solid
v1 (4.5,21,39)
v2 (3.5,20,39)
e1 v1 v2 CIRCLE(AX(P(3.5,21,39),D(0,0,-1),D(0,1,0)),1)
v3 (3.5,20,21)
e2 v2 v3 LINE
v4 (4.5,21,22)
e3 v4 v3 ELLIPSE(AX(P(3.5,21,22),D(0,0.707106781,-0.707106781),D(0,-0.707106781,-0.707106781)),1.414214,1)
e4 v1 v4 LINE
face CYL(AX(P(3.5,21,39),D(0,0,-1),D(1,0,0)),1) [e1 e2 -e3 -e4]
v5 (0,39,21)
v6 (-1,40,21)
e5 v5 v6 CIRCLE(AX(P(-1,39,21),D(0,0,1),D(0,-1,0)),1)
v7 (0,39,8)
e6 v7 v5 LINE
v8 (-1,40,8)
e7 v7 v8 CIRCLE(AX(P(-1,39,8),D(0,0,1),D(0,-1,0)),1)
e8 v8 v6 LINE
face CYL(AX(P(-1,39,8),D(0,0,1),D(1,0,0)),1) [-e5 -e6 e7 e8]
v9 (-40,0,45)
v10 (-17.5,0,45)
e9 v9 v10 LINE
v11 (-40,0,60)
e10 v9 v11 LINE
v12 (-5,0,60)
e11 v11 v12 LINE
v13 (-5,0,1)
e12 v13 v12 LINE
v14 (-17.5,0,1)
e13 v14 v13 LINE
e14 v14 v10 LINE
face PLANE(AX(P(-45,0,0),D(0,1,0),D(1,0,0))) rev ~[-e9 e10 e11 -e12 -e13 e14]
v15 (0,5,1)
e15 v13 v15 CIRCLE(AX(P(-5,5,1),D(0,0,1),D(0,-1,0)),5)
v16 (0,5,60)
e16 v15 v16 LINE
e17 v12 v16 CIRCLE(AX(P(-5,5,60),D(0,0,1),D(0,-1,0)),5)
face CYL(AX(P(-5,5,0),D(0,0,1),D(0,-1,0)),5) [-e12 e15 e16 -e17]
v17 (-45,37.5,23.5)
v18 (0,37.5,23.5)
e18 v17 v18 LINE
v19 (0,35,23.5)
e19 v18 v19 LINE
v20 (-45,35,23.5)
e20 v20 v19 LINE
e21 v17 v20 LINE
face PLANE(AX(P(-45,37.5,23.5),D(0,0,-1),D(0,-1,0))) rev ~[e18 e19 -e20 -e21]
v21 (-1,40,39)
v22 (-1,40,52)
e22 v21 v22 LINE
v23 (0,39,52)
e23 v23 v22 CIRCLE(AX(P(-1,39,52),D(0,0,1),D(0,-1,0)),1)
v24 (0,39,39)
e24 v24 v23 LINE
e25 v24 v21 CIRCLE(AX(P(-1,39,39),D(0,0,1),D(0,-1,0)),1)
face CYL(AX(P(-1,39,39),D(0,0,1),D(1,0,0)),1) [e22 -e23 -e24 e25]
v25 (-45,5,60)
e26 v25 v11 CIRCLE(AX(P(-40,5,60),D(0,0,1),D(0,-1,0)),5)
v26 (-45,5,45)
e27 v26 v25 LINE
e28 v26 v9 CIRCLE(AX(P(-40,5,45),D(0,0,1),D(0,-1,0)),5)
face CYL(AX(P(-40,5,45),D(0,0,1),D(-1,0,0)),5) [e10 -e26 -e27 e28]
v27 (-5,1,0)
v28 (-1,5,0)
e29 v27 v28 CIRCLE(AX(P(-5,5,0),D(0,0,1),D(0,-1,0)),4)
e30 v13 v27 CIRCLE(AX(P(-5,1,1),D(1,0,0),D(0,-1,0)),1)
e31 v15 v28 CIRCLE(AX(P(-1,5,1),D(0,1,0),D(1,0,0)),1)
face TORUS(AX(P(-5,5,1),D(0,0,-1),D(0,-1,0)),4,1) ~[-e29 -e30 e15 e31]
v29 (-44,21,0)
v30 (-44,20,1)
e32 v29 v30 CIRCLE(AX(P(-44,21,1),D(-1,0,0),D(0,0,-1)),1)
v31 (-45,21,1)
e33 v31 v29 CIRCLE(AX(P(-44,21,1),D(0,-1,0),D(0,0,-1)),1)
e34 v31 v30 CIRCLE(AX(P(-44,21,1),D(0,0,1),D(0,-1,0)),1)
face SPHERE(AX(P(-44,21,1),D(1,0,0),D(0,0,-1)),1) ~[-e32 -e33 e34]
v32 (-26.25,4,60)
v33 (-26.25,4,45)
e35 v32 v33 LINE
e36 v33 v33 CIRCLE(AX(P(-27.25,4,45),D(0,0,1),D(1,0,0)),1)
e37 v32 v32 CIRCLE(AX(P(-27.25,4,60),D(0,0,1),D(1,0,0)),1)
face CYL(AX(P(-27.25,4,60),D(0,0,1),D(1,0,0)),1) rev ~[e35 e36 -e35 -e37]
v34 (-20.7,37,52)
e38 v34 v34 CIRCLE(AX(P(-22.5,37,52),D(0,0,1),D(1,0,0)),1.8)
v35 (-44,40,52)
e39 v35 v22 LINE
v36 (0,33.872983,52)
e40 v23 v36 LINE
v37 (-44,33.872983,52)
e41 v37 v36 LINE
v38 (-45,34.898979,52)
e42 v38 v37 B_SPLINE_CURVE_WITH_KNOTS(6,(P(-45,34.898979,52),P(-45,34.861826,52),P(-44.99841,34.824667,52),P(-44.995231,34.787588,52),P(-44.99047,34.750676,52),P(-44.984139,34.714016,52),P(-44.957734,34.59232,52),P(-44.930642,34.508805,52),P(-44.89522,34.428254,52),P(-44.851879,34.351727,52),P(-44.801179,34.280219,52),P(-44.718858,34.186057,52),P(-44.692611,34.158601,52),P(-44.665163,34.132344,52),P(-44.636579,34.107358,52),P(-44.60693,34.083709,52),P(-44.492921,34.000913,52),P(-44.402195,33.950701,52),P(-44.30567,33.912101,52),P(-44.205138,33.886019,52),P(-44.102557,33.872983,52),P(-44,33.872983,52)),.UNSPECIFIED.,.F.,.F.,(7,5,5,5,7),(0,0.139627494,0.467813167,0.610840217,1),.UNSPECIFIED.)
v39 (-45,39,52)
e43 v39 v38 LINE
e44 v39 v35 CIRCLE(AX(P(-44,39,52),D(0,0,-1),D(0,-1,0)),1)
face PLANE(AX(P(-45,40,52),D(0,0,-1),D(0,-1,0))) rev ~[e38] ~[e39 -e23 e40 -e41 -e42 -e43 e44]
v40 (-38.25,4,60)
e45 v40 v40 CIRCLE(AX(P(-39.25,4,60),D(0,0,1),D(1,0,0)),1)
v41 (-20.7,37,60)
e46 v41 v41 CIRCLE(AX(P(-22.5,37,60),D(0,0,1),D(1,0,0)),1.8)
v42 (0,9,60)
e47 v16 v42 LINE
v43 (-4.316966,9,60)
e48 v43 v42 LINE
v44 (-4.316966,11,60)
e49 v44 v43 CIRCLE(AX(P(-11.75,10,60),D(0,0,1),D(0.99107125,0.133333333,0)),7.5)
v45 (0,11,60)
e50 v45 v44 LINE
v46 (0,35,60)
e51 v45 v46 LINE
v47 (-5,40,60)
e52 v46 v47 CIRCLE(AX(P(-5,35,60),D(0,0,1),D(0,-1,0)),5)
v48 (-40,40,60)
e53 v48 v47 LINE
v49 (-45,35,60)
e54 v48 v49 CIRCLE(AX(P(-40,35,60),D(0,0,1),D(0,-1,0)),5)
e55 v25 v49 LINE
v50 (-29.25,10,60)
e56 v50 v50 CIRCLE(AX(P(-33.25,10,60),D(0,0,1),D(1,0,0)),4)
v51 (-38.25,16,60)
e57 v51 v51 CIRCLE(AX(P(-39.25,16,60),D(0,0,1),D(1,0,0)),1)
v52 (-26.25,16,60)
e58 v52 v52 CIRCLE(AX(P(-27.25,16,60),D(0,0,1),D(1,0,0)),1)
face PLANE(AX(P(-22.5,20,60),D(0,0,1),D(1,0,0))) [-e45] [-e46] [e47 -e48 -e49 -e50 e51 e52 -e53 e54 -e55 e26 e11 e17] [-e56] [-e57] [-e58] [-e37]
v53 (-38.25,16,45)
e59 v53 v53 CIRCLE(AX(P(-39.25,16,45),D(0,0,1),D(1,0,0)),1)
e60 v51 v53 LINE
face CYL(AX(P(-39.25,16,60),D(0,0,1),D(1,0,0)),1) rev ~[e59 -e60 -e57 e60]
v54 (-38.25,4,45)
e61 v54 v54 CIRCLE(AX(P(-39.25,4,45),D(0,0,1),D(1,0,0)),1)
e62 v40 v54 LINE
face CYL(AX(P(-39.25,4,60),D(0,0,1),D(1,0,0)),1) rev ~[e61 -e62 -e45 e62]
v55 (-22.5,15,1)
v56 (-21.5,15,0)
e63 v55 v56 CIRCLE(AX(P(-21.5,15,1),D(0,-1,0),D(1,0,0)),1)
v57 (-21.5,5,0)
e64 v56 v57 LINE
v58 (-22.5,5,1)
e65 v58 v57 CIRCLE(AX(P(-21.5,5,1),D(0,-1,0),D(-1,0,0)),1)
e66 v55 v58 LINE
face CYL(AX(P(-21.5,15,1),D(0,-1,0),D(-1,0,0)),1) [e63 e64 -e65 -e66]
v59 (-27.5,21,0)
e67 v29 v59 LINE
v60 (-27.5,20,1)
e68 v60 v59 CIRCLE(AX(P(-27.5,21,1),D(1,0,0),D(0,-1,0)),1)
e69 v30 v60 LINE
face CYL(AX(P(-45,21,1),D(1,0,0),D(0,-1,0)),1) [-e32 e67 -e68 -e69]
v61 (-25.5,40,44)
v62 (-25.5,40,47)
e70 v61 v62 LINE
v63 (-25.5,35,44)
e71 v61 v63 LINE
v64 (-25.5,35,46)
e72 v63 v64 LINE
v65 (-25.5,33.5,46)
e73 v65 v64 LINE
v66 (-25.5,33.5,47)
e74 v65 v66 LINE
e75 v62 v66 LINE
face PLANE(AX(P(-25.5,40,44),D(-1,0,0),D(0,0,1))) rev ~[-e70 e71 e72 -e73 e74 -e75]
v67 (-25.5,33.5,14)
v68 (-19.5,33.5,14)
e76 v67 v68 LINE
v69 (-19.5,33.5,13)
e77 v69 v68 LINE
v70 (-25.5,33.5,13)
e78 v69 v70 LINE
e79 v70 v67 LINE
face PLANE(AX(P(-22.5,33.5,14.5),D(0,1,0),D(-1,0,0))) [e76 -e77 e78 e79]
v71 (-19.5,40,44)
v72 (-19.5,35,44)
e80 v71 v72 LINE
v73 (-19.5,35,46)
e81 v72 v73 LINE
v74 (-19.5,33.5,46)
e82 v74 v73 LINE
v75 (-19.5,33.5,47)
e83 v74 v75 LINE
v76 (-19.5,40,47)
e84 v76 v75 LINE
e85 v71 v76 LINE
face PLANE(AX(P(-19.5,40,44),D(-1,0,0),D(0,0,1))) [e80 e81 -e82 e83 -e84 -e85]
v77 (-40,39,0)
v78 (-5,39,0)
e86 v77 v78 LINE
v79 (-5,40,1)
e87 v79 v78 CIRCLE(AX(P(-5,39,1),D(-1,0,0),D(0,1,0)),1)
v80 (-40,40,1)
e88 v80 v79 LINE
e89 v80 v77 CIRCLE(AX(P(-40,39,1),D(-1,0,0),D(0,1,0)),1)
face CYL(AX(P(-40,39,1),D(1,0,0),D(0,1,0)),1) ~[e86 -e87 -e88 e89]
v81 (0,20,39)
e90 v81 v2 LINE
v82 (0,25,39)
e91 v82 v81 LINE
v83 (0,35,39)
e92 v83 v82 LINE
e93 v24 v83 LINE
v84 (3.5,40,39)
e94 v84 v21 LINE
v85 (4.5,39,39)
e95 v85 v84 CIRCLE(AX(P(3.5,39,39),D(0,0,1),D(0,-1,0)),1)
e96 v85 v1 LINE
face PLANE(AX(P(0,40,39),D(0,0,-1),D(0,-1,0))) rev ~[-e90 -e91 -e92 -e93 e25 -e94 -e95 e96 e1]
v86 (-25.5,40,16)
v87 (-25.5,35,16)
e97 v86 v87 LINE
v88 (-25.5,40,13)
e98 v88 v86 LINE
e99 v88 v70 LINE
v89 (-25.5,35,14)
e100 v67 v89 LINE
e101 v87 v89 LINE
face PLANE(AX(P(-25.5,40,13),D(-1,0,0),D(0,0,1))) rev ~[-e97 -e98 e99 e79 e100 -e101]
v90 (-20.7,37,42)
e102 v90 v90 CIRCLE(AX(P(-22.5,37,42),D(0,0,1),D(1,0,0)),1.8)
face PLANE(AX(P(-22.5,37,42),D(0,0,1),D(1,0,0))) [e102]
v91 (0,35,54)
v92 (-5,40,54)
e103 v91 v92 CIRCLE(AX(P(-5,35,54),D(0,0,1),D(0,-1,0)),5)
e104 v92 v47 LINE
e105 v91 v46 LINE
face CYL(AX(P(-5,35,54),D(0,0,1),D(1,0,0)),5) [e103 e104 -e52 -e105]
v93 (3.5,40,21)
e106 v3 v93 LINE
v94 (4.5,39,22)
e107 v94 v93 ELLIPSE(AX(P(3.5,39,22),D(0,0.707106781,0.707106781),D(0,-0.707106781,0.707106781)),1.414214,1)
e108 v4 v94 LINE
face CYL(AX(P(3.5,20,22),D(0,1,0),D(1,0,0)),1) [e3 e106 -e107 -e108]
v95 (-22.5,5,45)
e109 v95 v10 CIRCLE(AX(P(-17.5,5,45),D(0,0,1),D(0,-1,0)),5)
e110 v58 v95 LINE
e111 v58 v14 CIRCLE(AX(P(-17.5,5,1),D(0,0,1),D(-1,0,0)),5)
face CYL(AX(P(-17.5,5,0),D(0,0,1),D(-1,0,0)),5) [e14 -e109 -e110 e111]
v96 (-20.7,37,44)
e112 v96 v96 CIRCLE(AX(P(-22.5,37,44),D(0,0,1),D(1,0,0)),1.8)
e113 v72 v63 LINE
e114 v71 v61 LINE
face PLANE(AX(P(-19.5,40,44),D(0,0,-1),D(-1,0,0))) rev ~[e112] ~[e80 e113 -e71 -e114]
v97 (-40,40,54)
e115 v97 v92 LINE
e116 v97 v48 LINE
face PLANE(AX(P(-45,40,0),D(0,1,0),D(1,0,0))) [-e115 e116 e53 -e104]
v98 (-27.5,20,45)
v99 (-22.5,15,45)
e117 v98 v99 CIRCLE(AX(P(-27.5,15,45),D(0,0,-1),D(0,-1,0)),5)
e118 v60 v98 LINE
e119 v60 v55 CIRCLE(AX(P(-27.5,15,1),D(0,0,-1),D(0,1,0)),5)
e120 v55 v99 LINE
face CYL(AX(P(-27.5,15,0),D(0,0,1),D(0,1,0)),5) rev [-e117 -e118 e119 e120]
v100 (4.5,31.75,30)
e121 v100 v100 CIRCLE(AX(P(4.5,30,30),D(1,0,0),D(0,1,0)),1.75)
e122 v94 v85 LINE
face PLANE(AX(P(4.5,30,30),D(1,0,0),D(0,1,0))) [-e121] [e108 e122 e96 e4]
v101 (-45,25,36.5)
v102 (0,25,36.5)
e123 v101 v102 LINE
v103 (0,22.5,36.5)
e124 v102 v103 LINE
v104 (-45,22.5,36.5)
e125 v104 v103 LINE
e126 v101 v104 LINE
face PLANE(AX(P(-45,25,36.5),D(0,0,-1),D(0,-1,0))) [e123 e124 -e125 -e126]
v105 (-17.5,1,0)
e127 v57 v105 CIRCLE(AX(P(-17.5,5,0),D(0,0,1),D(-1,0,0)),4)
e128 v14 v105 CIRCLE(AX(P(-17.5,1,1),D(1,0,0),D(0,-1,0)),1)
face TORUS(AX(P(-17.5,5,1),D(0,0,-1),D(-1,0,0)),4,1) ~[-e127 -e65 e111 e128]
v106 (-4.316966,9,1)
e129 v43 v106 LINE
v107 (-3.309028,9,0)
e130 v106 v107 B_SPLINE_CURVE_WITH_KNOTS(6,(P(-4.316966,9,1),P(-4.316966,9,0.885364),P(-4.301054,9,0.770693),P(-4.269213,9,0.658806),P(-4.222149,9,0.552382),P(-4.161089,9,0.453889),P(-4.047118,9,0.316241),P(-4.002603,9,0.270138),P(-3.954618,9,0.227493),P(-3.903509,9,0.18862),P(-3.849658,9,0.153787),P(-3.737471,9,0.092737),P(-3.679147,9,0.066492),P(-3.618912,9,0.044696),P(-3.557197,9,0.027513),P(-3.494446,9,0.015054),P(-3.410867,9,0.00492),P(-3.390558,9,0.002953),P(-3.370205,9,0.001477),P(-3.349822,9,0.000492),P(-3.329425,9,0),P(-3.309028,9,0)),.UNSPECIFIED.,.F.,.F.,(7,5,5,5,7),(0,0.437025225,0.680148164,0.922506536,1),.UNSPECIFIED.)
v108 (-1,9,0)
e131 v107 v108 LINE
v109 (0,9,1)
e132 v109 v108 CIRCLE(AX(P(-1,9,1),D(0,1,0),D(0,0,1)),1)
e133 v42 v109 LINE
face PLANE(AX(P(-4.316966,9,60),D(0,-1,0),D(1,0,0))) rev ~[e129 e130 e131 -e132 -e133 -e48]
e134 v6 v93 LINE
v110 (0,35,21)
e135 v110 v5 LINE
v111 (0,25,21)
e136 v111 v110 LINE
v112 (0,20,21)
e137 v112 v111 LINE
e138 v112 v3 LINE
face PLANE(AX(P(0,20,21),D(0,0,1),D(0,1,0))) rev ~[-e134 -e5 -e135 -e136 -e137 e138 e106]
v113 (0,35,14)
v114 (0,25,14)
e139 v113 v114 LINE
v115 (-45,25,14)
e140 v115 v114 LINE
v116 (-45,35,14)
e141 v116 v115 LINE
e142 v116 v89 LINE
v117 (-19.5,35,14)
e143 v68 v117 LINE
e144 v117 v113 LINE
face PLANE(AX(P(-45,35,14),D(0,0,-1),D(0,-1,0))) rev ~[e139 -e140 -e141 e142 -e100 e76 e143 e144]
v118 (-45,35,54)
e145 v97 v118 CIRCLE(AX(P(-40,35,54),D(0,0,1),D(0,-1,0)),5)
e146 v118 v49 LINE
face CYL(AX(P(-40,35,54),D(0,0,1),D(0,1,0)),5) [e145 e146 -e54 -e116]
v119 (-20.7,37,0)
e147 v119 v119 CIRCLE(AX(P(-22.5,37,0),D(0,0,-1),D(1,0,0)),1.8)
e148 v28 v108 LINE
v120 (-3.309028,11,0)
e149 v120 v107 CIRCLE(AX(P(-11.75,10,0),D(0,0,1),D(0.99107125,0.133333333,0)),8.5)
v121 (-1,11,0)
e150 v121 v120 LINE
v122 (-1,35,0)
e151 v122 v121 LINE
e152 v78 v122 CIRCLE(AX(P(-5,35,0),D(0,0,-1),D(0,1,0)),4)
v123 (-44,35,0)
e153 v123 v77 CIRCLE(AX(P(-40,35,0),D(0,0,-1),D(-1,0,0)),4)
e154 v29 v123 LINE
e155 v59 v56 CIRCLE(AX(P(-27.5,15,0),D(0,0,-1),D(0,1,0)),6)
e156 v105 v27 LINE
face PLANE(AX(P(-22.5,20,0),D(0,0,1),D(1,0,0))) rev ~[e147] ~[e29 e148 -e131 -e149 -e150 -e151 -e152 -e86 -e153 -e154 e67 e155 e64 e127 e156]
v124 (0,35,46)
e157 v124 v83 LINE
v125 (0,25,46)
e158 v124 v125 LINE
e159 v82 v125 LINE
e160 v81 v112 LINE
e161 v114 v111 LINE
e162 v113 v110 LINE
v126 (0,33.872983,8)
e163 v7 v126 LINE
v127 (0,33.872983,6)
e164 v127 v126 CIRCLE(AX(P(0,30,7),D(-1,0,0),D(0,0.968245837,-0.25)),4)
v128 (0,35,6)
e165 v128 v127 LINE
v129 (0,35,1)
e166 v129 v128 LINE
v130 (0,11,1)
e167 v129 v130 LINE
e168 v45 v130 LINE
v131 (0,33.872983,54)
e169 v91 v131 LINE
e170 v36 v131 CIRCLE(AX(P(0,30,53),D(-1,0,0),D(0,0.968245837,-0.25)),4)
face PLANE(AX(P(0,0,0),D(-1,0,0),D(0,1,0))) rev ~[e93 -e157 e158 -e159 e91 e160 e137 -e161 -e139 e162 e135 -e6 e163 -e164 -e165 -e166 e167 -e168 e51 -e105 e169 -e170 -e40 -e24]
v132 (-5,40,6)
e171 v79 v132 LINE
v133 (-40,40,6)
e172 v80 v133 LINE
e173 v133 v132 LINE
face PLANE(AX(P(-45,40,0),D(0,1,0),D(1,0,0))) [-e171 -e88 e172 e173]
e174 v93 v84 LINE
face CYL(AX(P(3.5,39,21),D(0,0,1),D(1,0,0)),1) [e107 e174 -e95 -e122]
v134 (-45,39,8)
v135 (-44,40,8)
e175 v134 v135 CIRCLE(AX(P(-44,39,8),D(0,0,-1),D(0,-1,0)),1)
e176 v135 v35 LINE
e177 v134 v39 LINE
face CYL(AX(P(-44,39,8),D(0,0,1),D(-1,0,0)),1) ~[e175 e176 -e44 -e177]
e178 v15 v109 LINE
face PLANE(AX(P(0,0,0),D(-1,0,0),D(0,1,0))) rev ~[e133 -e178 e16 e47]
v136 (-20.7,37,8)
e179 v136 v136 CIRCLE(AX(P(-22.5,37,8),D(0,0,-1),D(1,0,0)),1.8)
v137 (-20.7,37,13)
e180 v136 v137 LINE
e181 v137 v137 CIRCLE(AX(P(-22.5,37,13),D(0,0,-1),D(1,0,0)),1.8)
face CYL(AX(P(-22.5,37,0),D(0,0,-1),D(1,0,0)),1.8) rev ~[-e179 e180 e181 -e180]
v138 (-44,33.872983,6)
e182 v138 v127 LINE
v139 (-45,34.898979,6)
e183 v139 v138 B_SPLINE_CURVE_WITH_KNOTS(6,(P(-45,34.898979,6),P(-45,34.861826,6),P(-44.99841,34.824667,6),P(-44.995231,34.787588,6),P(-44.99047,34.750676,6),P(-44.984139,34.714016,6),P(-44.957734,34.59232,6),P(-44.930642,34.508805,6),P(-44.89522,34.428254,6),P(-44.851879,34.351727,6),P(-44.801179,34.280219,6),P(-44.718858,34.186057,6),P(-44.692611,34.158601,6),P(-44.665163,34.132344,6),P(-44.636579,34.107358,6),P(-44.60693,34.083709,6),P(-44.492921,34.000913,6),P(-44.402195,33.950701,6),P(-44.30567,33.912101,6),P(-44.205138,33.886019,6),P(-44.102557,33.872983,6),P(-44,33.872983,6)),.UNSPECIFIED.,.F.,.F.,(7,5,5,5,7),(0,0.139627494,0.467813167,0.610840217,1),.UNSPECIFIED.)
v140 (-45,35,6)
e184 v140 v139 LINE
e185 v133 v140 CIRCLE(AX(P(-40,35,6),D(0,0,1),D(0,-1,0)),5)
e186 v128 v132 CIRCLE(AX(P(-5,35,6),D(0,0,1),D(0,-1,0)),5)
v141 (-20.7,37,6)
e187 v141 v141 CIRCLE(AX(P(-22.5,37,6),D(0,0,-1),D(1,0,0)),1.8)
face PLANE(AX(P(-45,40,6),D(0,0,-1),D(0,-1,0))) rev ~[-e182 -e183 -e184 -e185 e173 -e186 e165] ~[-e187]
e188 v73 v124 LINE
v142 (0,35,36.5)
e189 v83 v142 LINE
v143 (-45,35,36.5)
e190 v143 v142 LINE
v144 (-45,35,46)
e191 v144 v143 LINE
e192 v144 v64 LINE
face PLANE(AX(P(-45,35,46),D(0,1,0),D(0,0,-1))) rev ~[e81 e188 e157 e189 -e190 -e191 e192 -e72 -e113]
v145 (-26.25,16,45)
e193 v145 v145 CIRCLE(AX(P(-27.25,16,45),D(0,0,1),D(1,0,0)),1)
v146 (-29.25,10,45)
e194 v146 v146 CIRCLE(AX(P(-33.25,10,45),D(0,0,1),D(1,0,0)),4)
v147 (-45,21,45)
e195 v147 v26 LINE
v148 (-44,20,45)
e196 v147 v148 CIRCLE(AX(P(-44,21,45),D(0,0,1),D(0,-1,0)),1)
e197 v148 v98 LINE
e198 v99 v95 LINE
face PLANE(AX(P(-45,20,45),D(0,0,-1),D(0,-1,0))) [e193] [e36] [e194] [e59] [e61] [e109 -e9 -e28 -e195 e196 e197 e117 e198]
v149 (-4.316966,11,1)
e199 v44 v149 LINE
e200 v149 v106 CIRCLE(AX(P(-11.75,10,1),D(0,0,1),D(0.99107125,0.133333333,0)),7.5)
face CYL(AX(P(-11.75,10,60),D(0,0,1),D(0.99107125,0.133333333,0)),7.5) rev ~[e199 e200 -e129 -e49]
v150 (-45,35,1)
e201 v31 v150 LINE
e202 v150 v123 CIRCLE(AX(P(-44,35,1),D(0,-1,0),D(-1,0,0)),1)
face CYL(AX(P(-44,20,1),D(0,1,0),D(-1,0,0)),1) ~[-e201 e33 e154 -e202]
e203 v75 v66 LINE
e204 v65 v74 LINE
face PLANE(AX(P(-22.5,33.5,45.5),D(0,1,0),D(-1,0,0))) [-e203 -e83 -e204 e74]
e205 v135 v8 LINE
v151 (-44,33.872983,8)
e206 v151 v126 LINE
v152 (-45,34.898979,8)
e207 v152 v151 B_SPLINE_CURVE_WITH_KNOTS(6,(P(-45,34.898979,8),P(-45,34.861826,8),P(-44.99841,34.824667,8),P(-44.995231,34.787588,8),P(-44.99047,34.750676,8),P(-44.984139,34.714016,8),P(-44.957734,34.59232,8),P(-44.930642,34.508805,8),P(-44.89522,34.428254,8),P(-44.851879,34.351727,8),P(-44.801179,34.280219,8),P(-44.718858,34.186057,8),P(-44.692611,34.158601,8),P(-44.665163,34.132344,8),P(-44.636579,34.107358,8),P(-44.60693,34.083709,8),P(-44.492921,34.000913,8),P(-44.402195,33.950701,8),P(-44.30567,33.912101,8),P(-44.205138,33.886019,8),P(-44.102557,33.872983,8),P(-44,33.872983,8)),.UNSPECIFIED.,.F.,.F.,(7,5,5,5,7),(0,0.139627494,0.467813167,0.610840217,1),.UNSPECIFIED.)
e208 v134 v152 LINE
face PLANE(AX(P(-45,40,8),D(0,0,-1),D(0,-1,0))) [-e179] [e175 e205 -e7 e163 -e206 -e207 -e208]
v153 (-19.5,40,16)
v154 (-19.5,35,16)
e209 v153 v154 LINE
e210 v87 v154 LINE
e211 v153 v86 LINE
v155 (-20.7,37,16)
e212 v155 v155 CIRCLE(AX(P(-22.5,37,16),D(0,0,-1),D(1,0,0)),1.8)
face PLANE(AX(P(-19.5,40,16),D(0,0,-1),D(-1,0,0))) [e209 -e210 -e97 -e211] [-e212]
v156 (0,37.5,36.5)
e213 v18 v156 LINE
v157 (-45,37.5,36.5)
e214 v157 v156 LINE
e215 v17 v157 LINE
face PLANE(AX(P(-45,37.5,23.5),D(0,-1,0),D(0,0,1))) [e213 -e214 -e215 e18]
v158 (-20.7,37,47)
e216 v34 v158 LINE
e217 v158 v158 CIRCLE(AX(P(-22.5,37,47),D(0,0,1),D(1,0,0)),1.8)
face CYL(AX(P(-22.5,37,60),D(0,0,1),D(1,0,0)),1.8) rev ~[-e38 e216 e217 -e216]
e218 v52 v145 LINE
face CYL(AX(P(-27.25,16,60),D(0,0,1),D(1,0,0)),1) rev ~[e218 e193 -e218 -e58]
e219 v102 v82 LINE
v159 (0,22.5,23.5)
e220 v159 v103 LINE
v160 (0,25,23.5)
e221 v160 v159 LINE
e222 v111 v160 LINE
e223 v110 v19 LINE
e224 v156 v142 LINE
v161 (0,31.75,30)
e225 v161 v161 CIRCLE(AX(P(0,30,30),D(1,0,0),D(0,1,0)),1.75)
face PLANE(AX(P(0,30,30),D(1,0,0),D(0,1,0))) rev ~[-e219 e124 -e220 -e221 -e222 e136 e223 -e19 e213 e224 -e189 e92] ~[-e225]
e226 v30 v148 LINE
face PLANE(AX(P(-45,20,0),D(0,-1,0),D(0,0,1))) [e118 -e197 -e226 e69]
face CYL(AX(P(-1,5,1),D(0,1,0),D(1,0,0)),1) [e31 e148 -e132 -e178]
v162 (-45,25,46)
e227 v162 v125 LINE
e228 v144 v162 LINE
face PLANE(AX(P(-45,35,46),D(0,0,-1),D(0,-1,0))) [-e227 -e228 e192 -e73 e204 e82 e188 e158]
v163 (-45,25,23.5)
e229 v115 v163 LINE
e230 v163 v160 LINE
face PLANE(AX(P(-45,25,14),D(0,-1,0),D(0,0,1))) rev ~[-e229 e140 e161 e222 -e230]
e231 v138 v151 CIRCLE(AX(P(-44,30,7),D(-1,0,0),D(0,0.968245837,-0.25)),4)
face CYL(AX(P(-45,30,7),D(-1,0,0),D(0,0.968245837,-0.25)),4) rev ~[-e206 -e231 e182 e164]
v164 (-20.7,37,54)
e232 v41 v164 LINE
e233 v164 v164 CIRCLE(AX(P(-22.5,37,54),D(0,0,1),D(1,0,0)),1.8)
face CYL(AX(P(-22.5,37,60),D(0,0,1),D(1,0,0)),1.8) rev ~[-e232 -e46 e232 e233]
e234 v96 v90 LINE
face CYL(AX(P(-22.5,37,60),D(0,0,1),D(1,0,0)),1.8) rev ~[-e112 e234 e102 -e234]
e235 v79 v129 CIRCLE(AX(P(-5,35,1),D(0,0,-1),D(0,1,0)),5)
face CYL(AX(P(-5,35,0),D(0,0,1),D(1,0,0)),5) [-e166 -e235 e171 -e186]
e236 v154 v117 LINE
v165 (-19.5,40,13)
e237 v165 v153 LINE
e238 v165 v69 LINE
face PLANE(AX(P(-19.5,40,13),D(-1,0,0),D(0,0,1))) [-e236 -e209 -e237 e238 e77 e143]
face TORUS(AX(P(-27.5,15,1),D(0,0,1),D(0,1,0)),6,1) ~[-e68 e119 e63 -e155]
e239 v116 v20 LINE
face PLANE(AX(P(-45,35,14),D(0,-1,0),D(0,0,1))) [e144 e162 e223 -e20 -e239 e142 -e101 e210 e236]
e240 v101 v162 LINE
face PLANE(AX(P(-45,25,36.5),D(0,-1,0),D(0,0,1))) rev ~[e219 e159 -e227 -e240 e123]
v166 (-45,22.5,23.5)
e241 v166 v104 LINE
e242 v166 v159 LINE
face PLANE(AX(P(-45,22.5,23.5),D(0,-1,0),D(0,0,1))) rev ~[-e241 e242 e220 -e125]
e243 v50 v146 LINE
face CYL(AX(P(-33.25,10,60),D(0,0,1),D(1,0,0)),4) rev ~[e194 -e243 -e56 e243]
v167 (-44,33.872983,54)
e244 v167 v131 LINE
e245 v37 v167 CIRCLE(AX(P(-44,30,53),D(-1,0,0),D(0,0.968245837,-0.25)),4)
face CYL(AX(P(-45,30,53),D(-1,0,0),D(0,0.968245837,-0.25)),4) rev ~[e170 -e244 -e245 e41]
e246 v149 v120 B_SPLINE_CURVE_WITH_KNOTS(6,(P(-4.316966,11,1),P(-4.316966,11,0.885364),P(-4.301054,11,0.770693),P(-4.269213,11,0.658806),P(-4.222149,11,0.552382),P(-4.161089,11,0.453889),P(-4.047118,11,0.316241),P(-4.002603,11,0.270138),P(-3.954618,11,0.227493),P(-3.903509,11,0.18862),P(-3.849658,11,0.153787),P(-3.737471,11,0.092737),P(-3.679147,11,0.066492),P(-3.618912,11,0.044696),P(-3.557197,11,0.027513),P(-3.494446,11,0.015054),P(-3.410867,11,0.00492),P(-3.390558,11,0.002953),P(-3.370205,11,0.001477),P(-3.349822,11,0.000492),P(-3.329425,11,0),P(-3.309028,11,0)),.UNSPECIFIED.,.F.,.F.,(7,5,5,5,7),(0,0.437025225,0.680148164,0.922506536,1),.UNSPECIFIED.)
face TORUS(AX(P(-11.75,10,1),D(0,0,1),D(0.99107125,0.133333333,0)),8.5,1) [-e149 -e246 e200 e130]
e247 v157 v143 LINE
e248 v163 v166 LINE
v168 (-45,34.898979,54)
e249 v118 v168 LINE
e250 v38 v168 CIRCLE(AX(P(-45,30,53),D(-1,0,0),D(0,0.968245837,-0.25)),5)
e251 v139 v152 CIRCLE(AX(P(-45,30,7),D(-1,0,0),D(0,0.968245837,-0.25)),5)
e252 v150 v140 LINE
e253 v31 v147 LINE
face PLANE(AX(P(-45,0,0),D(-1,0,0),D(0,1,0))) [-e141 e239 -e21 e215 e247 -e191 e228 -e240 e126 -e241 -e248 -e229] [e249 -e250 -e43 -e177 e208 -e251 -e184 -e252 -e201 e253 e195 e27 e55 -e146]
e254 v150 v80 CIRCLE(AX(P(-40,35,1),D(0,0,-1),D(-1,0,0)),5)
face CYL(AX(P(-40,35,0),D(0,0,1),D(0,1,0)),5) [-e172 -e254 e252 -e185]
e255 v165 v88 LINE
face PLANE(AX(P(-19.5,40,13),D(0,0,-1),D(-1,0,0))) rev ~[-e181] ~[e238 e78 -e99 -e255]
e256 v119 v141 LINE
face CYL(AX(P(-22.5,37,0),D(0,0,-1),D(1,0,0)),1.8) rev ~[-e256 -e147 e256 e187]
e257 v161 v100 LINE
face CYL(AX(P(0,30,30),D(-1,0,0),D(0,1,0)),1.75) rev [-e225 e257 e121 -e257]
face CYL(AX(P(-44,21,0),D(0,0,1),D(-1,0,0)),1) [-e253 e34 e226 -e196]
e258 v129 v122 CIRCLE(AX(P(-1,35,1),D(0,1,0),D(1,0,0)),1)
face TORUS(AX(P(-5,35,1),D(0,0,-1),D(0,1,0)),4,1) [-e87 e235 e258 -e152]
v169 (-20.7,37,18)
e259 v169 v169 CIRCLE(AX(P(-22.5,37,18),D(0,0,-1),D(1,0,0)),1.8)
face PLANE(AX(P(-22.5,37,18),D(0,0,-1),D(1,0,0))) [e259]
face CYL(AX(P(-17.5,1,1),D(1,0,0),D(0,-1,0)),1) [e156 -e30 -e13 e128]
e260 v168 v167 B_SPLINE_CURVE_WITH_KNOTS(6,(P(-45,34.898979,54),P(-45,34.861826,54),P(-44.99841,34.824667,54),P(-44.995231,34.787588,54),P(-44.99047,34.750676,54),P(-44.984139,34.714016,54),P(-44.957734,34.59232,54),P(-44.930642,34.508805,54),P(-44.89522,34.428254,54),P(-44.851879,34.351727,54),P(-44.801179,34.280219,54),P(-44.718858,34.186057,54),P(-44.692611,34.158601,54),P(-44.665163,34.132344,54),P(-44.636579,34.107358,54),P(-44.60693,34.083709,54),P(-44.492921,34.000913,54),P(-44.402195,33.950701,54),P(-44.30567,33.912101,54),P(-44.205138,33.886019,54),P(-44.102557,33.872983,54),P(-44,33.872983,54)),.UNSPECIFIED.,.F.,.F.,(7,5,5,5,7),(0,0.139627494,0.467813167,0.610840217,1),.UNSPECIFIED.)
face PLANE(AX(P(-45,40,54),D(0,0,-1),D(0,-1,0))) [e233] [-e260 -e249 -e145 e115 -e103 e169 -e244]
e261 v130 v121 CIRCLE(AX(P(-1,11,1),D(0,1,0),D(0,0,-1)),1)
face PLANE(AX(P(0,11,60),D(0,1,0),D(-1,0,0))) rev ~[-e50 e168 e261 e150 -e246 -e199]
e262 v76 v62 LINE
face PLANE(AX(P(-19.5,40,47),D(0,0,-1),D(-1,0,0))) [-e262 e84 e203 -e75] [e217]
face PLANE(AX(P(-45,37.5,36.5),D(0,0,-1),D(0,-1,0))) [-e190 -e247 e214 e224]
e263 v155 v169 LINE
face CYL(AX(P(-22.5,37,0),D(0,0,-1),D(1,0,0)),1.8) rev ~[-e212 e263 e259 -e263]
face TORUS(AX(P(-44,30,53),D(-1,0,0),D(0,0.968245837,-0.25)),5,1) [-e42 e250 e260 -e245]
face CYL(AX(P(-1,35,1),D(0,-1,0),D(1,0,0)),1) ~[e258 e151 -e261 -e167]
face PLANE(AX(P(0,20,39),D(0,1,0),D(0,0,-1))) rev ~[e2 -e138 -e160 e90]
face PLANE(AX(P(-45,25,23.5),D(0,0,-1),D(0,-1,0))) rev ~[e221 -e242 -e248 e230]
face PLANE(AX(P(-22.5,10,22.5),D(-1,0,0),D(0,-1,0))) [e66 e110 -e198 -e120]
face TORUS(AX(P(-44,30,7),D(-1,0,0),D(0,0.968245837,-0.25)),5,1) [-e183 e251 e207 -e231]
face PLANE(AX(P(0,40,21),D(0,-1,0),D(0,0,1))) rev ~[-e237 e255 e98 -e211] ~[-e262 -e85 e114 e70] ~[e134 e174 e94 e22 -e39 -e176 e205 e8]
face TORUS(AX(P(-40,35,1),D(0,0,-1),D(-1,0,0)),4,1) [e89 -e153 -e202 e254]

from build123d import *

# Parameters (mm, degrees)
F0_W      = 45
F0_H      = 40
F1_DEPTH  = 60
F3_W      = 10
F3_H      = 9.5
F3_H_2    = 13
F3_W_2    = 2.5
F3_W_3    = 6.1270166538
F3_H_3    = 2
F4_DEPTH  = 45
F3_W_4    = 20
F3_H_4    = 45
F5_DEPTH  = 22.5
F2_R      = 4
F2_R_2    = 1
F6_DEPTH  = 60
F7_R      = 1.75
F7_W      = 10
F7_H      = 2.5
F8_DEPTH  = 4.5
F2_R_3    = 1.8
F9_DEPTH  = 18
F10_R     = 1.8
F11_DEPTH = 18
F12_W     = 6
F12_H     = 3
F13_DEPTH = 6.5
F14_R     = 5
F15_R     = 1


# Not quite as in the source:
# - a feature names something its author has since deleted; it is built from what else it names


with BuildPart() as f1:
    # F0 (on Top) → F1 (new body)
    with BuildSketch(Plane.XY):
        with Locations((-22.5, 20)):
            Rectangle(F0_W, F0_H)
    extrude(amount=F1_DEPTH)

    # F3 (on face) → F4 (cut)
    with BuildSketch(Plane(origin=(-45, 0, 0), x_dir=(0, -1, 0), z_dir=(-1, 0, 0))):
        with BuildLine():
            Line((-33.8729833462, 54), (-33.8729833462, 52))
            ThreePointArc((-33.8729833462, 52), (-26, 53), (-33.8729833462, 54))
        make_face()
        with BuildLine():
            Line((-33.8729833462, 8), (-33.8729833462, 6))
            ThreePointArc((-33.8729833462, 6), (-26, 7), (-33.8729833462, 8))
        make_face()
        with Locations((-30, 41.25)):
            Rectangle(F3_W, F3_H)
        with Locations((-30, 30)):
            Rectangle(F3_W, F3_H_2)
        with Locations((-23.75, 30)):
            Rectangle(F3_W_2, F3_H_2)
        with Locations((-36.25, 30)):
            Rectangle(F3_W_2, F3_H_2)
        with Locations((-30, 18.75)):
            Rectangle(F3_W, F3_H)
        with Locations((-36.9364916731, 53)):
            Rectangle(F3_W_3, F3_H_3)
        with Locations((-36.9364916731, 7)):
            Rectangle(F3_W_3, F3_H_3)
    extrude(amount=-F4_DEPTH, mode=Mode.SUBTRACT)

    # F3 (on face) → F5 (cut)
    with BuildSketch(Plane(origin=(-45, 0, 0), x_dir=(0, -1, 0), z_dir=(-1, 0, 0))):
        with Locations((-10, 22.5)):
            Rectangle(F3_W_4, F3_H_4)
    extrude(amount=-F5_DEPTH, mode=Mode.SUBTRACT)

    # F2 (on face) → F6 (cut)
    with BuildSketch(Plane.XY.offset(60)):
        with Locations((-33.25, 10)):
            Circle(F2_R)
        with Locations((-27.25, 16)):
            Circle(F2_R_2)
        with Locations((-39.25, 16)):
            Circle(F2_R_2)
        with Locations((-27.25, 4)):
            Circle(F2_R_2)
        with Locations((-39.25, 4)):
            Circle(F2_R_2)
        with BuildLine():
            ThreePointArc((-4.25, 10), (-4.2667601334, 10.5011198447), (-4.3169656263, 11))
            ThreePointArc((-4.3169656263, 11), (-19.25, 10), (-4.3169656263, 9))
            ThreePointArc((-4.3169656263, 9), (-4.2667601334, 9.4988801553), (-4.25, 10))
        make_face()
        with Locations((-11.75, 10)):
            Circle(F2_R, mode=Mode.SUBTRACT)
        with Locations((-11.75, 10)):
            Circle(F2_R)
        with BuildLine():
            Line((0, 9), (0, 10))
            Line((0, 10), (-4.25, 10))
            ThreePointArc((-4.25, 10), (-4.2667601334, 9.4988801553), (-4.3169656263, 9))
            Line((-4.3169656263, 9), (0, 9))
        make_face()
        with BuildLine():
            Line((0, 10), (0, 11))
            Line((0, 11), (-4.3169656263, 11))
            ThreePointArc((-4.3169656263, 11), (-4.2667601334, 10.5011198447), (-4.25, 10))
            Line((-4.25, 10), (0, 10))
        make_face()
    extrude(amount=-F6_DEPTH, mode=Mode.SUBTRACT)

    # F7 (on face) → F8 (join)
    with BuildSketch(Plane.YZ):
        Polygon((37.5, 23.5), (37.5, 36.5), (35, 36.5), (25, 36.5), (22.5, 36.5), (22.5, 23.5), (25, 23.5), (35, 23.5), align=None)
        with Locations((30, 30)):
            Circle(F7_R, mode=Mode.SUBTRACT)
        Polygon((22.5, 36.5), (25, 36.5), (25, 39), (20, 39), (20, 21), (25, 21), (25, 23.5), (22.5, 23.5), align=None)
        with Locations((30, 37.75)):
            Rectangle(F7_W, F7_H)
        Polygon((35, 36.5), (37.5, 36.5), (37.5, 23.5), (35, 23.5), (35, 21), (40, 21), (40, 39), (35, 39), align=None)
        with Locations((30, 22.25)):
            Rectangle(F7_W, F7_H)
    extrude(amount=F8_DEPTH)

    # F2 (on face) → F9 (cut)
    with BuildSketch(Plane.XY.offset(60)):
        with Locations((-22.5, 37)):
            Circle(F2_R_3)
    extrude(amount=-F9_DEPTH, mode=Mode.SUBTRACT)

    # F10 (on face) → F11 (cut)
    with BuildSketch(Plane(origin=(0, 0, 0), x_dir=(1, 0, 0), z_dir=(0, 0, -1))):
        with Locations((-22.5, -37)):
            Circle(F10_R)
    extrude(amount=-F11_DEPTH, mode=Mode.SUBTRACT)

    # F12 (on face) → F13 (cut)
    with BuildSketch(Plane(origin=(0, 40, 0), x_dir=(-1, 0, 0), z_dir=(0, 1, 0))):
        with Locations((22.5, 45.5)):
            Rectangle(F12_W, F12_H)
        with Locations((22.5, 14.5)):
            Rectangle(F12_W, F12_H)
    extrude(amount=-F13_DEPTH, mode=Mode.SUBTRACT)

    # F14
    f14_edges = [f1.edges().sort_by_distance(p)[0] for p in [
        (-45, 0, 52.5),
        (-22.5, 0, 22.5),
        (-22.5, 20, 22.5),
        (0, 0, 30),
        (0, 40, 57),
        (0, 40, 3),
        (-45, 40, 3),
        (-45, 40, 57),
    ]]
    fillet(f14_edges, radius=F14_R)

    # F15
    f15_edges = [f1.edges().sort_by_distance(p)[0] for p in [
        (-36.25, 20, 0),
        (-22.5, 40, 0),
        (-19.25, 10, 0),
        (-45, 20, 22.5),
        (0, 40, 14.5),
        (0, 40, 45.5),
        (4.5, 40, 30),
        (4.5, 20, 30),
        (4.5, 30, 21),
        (-45, 26, 53),
        (-45, 26, 7),
        (-45, 40, 30),
    ]]
    fillet(f15_edges, radius=F15_R)


solid = f1.part
